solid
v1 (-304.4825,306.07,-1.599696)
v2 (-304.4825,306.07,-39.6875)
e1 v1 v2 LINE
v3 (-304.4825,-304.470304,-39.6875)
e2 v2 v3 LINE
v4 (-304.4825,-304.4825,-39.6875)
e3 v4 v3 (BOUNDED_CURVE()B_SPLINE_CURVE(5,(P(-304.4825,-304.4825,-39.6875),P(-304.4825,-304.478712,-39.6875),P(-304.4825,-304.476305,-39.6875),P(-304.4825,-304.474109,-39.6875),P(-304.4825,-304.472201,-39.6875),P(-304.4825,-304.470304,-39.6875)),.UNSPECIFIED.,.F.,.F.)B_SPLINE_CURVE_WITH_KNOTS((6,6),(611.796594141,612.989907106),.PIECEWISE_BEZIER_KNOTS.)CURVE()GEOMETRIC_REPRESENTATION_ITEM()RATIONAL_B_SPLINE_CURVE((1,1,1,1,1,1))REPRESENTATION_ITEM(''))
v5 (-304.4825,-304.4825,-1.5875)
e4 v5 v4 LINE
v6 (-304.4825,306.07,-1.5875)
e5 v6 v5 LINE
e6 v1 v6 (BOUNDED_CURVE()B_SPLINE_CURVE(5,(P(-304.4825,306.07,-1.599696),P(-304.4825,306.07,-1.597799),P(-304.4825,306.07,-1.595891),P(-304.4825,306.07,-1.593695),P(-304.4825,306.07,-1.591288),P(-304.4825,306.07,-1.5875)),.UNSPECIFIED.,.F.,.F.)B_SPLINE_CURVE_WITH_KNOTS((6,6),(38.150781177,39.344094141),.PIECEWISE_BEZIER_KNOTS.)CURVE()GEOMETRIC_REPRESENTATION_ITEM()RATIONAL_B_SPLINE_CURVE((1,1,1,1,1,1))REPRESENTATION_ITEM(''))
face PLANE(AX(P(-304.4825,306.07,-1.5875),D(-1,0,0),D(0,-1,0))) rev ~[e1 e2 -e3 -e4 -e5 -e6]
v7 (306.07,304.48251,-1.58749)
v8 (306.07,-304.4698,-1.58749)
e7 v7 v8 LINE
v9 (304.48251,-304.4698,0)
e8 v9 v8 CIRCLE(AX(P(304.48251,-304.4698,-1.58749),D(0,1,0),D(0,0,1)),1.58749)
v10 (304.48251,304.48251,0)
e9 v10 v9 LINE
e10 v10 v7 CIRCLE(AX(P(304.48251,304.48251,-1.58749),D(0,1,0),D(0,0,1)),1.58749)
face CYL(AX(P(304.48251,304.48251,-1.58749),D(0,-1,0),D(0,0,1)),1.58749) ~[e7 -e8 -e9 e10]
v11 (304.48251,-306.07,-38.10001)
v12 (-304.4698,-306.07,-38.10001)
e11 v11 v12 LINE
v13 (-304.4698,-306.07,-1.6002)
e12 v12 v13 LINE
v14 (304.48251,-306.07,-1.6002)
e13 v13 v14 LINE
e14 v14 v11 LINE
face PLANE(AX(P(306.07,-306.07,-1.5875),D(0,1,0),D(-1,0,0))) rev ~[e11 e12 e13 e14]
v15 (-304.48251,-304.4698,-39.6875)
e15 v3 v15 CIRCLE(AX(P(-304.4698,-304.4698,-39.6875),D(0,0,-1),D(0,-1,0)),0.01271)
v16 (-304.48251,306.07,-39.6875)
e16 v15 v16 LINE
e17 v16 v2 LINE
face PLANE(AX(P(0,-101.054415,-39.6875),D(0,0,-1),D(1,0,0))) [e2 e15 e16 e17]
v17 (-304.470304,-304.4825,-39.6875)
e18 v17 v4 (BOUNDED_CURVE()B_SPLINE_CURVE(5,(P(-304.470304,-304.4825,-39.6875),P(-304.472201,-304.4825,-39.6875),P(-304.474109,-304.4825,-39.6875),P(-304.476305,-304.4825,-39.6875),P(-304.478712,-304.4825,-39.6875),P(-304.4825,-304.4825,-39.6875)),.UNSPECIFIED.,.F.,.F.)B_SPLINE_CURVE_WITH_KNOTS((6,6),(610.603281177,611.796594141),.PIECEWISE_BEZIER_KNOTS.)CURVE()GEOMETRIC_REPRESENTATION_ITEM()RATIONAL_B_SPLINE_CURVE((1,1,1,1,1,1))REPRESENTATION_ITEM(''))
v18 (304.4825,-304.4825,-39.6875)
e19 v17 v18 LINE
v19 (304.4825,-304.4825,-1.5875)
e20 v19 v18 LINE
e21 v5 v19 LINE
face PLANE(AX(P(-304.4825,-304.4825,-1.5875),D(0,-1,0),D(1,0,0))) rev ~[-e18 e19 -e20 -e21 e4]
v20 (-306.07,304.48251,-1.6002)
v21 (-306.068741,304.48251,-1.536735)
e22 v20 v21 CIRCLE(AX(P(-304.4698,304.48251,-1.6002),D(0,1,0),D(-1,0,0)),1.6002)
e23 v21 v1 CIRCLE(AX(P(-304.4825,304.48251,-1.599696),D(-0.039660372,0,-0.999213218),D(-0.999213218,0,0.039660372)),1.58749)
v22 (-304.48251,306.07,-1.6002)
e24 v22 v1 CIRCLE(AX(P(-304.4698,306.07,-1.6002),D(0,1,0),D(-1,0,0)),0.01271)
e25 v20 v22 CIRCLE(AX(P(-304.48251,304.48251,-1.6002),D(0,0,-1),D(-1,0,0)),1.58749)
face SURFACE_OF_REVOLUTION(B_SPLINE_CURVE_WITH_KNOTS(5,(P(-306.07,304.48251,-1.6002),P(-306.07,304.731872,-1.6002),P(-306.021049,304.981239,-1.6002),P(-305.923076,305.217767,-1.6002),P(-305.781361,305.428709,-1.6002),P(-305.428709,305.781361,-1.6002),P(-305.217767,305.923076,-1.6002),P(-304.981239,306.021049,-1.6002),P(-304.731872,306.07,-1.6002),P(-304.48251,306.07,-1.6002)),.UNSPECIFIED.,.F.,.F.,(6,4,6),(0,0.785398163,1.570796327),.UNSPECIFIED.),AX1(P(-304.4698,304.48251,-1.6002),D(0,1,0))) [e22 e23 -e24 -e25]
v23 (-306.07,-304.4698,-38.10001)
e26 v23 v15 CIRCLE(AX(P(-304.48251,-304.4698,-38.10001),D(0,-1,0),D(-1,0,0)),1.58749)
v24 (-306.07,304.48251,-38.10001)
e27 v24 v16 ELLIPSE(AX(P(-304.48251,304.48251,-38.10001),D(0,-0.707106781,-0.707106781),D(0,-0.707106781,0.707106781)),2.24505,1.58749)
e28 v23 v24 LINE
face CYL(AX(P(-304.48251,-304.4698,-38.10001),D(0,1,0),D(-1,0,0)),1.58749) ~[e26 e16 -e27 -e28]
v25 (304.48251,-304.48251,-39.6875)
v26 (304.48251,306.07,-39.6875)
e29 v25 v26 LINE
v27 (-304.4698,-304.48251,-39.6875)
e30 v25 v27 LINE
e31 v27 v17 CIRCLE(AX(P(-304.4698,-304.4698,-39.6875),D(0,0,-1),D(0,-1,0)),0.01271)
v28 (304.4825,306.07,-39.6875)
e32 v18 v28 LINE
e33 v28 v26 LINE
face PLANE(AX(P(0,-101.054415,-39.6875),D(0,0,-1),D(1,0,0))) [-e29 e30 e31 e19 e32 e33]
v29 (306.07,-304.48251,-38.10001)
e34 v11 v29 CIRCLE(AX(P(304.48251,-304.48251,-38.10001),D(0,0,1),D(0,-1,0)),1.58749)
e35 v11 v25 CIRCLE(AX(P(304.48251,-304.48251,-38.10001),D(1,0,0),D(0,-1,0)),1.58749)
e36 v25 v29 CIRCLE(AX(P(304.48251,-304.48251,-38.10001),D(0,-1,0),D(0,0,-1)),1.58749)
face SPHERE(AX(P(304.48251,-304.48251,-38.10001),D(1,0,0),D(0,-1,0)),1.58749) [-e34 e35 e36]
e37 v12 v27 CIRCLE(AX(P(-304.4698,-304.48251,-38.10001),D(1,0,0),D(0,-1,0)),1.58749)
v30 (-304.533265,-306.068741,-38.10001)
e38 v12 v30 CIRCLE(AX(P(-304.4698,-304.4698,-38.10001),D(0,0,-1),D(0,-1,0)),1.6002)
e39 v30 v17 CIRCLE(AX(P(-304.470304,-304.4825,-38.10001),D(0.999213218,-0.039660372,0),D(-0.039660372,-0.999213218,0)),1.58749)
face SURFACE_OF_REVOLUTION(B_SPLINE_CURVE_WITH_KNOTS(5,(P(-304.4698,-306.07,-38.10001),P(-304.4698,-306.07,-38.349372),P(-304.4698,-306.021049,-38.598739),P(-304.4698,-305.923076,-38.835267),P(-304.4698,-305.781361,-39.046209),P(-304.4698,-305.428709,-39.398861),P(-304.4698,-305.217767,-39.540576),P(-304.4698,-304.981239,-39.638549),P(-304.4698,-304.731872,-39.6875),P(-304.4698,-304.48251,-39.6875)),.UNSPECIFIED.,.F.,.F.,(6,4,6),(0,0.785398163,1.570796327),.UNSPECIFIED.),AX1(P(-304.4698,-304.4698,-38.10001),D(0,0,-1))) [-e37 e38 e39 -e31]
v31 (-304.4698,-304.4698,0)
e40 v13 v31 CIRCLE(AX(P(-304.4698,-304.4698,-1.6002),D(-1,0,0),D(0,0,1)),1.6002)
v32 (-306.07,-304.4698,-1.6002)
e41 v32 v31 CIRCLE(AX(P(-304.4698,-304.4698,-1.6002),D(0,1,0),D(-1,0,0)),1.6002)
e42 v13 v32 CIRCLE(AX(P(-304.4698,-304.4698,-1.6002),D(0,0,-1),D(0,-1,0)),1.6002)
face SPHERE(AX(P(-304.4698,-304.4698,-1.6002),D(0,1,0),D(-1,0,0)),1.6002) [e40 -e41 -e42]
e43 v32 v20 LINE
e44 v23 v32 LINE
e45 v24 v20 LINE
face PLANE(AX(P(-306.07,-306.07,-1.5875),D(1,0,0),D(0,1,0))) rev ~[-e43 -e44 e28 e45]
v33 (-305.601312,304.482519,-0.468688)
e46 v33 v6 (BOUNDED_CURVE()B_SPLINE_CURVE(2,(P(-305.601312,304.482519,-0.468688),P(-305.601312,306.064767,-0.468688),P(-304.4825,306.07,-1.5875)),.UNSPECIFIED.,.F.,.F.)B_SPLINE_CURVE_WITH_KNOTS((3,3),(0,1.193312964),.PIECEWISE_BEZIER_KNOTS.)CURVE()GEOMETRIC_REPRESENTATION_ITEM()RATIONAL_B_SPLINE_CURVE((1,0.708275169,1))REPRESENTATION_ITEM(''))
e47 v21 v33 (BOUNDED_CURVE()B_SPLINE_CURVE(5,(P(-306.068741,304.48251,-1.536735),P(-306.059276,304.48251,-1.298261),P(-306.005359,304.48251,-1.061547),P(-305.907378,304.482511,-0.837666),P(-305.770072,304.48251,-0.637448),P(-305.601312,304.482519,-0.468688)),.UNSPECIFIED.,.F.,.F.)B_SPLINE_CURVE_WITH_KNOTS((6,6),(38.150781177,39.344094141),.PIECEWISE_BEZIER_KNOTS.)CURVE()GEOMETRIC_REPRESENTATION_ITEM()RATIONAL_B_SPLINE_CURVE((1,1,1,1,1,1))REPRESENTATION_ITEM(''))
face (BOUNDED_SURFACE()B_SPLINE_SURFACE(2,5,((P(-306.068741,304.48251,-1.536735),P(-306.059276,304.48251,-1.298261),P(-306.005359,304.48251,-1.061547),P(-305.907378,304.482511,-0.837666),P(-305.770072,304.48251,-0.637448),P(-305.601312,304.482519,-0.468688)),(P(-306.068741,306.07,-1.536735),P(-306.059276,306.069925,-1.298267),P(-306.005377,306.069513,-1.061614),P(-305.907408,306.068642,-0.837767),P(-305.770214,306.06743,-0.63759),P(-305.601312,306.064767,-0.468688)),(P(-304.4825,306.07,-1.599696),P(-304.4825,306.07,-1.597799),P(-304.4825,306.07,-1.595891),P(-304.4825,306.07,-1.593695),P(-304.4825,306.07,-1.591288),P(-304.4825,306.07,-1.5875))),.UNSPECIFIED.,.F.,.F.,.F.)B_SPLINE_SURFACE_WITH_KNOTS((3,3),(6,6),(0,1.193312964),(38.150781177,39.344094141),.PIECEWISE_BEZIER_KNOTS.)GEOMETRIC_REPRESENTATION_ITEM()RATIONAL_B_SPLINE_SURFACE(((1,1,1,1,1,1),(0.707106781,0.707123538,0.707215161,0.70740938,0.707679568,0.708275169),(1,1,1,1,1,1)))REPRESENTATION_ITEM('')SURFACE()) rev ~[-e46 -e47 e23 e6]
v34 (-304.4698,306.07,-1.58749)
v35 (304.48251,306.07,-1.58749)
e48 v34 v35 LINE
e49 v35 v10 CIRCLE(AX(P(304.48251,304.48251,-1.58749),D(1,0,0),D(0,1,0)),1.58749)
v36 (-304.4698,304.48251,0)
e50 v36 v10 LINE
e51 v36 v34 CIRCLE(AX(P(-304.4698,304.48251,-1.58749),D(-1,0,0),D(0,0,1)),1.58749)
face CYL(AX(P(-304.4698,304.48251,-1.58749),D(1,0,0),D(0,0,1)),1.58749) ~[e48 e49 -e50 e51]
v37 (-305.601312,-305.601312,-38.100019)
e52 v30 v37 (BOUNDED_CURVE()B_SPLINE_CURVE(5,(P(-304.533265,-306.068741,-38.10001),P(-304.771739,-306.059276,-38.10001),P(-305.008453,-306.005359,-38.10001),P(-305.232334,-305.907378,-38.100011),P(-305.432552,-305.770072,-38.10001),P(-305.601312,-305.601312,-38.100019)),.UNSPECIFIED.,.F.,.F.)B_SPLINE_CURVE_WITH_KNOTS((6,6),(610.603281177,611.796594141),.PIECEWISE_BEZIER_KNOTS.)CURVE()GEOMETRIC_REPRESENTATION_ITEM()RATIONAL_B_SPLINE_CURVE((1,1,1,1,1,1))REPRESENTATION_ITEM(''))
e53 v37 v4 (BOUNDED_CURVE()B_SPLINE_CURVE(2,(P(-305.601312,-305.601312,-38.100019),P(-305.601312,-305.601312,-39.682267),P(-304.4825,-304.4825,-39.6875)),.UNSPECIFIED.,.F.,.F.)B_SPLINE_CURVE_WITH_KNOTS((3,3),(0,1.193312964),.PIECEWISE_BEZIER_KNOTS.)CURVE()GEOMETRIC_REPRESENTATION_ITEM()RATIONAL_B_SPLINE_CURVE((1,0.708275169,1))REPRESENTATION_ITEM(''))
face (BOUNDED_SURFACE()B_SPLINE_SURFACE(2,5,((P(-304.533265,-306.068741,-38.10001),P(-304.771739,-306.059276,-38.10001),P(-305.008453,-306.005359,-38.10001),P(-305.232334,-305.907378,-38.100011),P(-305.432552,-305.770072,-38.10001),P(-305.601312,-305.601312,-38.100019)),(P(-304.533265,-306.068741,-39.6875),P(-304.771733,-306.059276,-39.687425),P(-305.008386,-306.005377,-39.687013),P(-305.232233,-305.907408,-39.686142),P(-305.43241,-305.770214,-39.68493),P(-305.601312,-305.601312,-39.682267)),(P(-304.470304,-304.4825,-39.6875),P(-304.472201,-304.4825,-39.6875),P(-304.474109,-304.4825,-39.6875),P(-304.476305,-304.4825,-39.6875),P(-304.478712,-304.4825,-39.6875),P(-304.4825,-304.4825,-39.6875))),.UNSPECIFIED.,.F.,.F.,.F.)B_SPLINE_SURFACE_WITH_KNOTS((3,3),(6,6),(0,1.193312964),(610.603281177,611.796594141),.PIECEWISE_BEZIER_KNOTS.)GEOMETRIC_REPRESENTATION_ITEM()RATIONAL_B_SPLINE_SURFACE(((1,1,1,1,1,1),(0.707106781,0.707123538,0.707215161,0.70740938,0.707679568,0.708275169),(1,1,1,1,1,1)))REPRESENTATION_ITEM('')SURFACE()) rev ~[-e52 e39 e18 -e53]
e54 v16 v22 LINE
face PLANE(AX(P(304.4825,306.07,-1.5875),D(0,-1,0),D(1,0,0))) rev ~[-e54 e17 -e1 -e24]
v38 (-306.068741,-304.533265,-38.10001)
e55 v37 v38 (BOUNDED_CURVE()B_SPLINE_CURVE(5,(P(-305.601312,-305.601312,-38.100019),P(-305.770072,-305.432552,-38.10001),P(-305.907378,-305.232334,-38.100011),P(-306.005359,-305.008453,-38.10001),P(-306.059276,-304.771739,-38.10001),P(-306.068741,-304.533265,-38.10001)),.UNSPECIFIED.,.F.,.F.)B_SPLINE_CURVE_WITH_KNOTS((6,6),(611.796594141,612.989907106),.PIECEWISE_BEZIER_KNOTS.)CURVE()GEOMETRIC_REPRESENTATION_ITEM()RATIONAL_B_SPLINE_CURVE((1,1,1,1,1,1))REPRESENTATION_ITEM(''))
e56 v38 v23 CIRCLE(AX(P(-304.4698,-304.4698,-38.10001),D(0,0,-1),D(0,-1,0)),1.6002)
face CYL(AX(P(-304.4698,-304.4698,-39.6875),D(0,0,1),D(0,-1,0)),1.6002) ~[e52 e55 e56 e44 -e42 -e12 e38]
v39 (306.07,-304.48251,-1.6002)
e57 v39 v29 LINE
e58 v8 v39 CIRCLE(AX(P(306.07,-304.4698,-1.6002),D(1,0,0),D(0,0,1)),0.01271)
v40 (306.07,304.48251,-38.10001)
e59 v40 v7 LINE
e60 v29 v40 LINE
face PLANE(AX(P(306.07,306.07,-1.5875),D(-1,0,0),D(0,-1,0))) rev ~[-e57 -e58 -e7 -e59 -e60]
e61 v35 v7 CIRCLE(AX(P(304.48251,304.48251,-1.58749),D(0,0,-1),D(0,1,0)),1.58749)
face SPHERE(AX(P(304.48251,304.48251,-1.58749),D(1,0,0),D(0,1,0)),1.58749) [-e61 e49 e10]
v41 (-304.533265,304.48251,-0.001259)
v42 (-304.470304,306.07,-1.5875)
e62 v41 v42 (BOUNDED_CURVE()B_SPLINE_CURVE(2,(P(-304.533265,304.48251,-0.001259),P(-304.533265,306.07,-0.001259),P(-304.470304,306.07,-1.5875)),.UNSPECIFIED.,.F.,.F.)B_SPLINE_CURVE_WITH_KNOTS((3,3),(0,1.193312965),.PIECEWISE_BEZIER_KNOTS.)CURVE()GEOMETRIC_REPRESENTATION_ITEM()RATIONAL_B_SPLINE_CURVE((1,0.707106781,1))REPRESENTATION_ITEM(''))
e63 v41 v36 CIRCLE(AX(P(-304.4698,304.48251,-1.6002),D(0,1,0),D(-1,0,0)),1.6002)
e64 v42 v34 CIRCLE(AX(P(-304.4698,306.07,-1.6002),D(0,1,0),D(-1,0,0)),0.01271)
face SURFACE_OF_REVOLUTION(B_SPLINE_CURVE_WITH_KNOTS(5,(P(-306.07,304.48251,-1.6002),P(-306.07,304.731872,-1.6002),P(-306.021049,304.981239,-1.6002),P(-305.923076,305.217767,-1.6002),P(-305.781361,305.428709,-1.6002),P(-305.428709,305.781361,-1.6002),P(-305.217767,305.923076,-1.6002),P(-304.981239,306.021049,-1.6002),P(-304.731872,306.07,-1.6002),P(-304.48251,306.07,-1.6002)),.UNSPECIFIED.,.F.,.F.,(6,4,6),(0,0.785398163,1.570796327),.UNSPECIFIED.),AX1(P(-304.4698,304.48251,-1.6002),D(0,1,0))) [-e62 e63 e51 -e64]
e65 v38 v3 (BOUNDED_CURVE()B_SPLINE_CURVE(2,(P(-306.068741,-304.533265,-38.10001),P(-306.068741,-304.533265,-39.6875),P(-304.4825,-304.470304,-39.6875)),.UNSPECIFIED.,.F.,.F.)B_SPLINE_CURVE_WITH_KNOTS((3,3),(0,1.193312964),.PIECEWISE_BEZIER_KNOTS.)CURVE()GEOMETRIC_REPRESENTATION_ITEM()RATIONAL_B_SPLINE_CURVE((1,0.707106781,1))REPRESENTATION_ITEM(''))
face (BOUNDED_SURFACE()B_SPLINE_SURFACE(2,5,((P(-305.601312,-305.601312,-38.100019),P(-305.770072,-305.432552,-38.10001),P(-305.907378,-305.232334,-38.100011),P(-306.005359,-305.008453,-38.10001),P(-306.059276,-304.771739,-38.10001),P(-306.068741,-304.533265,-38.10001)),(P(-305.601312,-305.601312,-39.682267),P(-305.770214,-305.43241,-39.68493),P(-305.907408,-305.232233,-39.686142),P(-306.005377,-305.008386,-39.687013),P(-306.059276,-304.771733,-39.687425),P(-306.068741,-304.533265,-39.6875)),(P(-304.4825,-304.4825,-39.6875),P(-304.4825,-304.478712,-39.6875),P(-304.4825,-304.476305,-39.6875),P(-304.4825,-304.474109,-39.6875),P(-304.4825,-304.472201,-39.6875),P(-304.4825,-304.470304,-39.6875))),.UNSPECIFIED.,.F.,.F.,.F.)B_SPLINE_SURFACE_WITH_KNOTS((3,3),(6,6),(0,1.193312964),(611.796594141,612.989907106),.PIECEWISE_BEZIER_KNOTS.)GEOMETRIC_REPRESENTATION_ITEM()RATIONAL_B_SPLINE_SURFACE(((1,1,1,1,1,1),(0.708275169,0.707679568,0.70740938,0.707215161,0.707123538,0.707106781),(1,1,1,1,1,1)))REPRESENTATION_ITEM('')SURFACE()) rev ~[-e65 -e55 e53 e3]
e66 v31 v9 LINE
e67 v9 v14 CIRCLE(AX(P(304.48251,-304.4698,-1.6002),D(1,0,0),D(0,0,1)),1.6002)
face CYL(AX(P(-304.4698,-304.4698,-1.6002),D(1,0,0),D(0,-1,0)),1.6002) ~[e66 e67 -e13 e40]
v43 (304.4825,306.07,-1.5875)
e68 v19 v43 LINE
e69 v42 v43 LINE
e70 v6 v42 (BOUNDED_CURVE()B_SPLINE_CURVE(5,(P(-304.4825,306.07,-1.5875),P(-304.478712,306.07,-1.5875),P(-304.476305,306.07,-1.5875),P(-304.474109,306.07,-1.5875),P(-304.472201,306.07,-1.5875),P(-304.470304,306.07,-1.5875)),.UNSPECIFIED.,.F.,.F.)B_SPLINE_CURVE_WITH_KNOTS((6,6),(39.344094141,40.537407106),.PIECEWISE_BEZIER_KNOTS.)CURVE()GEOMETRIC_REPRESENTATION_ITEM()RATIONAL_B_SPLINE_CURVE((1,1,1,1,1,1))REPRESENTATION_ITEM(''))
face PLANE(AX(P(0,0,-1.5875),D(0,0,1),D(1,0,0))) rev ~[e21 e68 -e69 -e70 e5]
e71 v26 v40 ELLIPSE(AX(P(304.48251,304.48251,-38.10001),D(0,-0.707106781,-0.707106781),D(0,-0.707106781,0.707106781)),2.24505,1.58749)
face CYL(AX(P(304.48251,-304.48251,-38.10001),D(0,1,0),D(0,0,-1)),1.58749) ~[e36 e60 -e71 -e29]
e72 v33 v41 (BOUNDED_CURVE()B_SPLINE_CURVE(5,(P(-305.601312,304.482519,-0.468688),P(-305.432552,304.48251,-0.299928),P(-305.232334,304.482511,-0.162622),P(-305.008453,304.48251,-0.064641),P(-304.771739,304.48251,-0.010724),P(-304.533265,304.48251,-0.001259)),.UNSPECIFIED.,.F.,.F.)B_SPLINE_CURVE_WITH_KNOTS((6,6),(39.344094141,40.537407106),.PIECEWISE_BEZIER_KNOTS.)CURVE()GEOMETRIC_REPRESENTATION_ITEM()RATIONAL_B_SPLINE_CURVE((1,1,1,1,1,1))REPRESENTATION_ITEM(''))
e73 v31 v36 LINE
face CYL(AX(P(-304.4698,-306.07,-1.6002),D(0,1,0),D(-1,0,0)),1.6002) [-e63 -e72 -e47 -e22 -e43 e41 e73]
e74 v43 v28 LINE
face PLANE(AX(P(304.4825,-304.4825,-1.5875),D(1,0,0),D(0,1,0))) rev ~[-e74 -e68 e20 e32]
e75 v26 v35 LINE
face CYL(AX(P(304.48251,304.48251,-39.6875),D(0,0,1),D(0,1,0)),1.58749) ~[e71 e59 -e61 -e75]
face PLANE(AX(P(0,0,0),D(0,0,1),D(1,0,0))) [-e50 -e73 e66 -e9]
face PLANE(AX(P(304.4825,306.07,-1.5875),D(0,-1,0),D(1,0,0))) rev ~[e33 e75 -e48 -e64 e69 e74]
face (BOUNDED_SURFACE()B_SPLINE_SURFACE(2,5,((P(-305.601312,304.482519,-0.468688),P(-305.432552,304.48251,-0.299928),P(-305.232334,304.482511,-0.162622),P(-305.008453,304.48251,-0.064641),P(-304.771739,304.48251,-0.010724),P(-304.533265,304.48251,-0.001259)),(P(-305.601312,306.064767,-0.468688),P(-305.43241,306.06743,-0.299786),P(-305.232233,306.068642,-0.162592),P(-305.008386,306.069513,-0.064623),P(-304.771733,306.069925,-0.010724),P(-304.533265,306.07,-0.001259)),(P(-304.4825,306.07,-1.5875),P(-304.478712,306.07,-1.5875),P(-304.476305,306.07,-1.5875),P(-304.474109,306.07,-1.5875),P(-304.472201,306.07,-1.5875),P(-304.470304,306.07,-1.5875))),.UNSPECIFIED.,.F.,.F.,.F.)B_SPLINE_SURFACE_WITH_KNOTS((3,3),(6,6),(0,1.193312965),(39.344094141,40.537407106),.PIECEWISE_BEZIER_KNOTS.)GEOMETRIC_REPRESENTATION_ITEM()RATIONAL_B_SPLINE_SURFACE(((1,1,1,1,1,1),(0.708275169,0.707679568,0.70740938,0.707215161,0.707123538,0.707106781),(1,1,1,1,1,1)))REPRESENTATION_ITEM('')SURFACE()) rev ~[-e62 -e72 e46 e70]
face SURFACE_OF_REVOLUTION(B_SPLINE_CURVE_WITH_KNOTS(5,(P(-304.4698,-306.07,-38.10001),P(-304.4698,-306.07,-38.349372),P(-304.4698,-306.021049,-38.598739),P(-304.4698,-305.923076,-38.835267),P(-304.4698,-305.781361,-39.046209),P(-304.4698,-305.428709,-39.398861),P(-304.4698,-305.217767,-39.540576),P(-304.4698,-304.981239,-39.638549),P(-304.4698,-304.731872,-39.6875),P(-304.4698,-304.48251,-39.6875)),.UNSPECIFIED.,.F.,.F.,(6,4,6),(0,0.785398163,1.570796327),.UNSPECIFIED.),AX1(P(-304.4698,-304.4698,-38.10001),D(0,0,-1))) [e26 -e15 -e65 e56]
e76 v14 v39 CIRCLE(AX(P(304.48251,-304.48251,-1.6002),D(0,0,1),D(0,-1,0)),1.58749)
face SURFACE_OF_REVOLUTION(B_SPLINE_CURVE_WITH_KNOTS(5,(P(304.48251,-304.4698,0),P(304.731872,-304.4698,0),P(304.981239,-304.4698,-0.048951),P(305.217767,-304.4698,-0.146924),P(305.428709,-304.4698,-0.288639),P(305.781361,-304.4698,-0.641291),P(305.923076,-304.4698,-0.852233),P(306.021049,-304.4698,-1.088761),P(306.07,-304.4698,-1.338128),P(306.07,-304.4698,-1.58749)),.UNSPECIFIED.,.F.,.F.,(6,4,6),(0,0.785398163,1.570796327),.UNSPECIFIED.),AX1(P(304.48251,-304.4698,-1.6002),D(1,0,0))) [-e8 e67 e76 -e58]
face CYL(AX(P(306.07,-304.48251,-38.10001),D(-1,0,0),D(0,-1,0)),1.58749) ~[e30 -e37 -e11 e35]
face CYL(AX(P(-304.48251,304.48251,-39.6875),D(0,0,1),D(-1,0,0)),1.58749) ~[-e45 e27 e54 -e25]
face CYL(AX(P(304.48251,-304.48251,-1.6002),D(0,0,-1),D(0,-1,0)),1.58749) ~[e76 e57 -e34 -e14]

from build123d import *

# Parameters (mm, degrees)
F0_W     = 612.14
F0_H     = 612.14
F1_DEPTH = 1.5875
F3_DEPTH = 38.1
F4_R     = 1.6002
F5_R     = 1.6002
F6_R     = 1.58749
F7_R     = 1.58749


# Not quite as in the source:
# - a fillet or chamfer is up to 0.001 mm smaller than in the source, because OpenCascade refuses the exact size


with BuildPart() as f1:
    # F0 (on Top) → F1 (new body)
    with BuildSketch(Plane.XY):
        Rectangle(F0_W, F0_H)
    extrude(amount=-F1_DEPTH)

    # F2 (on face) → F3 (join)
    with BuildSketch(Plane(origin=(0, 0, -1.5875), x_dir=(1, 0, 0), z_dir=(0, 0, -1))):
        Polygon((304.4825, 304.4825), (304.4825, -306.07), (306.07, -306.07), (306.07, 306.07), (-306.07, 306.07), (-306.07, -306.07), (-304.4825, -306.07), (-304.4825, 304.4825), align=None)
    extrude(amount=F3_DEPTH)

    # F4
    f4_edges = [f1.edges().sort_by_distance(p)[0] for p in [
        (-306.07, 0, 0),
    ]]
    fillet(f4_edges, radius=F4_R)

    # F5
    f5_edges = [f1.edges().sort_by_distance(p)[0] for p in [
        (0.8001, -306.07, 0),
    ]]
    fillet(f5_edges, radius=F5_R)

    # F6 (radius 1.5875 in the source; OpenCascade refuses exactly that, so slightly less here)
    f6_edges = [f1.edges().sort_by_distance(p)[0] for p in [
        (-306.07, 0.8001, -1.6002),
        (-306.07, -304.4698, -20.64385),
        (-306.07, 306.07, -20.64385),
        (-306.07, 0.8001, -39.6875),
    ]]
    fillet(f6_edges, radius=F6_R)

    # F7 (radius 1.5875 in the source; OpenCascade refuses exactly that, so slightly less here)
    f7_edges = [f1.edges().sort_by_distance(p)[0] for p in [
        (306.07, -306.07, -19.850105),
        (306.07, -305.605035, -39.222535),
        (306.07, -305.601312, -0.468688),
        (306.07, 0.793745, -39.6875),
        (306.07, 0.006355, 0),
        (306.07, 306.07, -20.637495),
        (306.07, 305.605035, -0.464965),
    ]]
    fillet(f7_edges, radius=F7_R)


solid = f1.part
